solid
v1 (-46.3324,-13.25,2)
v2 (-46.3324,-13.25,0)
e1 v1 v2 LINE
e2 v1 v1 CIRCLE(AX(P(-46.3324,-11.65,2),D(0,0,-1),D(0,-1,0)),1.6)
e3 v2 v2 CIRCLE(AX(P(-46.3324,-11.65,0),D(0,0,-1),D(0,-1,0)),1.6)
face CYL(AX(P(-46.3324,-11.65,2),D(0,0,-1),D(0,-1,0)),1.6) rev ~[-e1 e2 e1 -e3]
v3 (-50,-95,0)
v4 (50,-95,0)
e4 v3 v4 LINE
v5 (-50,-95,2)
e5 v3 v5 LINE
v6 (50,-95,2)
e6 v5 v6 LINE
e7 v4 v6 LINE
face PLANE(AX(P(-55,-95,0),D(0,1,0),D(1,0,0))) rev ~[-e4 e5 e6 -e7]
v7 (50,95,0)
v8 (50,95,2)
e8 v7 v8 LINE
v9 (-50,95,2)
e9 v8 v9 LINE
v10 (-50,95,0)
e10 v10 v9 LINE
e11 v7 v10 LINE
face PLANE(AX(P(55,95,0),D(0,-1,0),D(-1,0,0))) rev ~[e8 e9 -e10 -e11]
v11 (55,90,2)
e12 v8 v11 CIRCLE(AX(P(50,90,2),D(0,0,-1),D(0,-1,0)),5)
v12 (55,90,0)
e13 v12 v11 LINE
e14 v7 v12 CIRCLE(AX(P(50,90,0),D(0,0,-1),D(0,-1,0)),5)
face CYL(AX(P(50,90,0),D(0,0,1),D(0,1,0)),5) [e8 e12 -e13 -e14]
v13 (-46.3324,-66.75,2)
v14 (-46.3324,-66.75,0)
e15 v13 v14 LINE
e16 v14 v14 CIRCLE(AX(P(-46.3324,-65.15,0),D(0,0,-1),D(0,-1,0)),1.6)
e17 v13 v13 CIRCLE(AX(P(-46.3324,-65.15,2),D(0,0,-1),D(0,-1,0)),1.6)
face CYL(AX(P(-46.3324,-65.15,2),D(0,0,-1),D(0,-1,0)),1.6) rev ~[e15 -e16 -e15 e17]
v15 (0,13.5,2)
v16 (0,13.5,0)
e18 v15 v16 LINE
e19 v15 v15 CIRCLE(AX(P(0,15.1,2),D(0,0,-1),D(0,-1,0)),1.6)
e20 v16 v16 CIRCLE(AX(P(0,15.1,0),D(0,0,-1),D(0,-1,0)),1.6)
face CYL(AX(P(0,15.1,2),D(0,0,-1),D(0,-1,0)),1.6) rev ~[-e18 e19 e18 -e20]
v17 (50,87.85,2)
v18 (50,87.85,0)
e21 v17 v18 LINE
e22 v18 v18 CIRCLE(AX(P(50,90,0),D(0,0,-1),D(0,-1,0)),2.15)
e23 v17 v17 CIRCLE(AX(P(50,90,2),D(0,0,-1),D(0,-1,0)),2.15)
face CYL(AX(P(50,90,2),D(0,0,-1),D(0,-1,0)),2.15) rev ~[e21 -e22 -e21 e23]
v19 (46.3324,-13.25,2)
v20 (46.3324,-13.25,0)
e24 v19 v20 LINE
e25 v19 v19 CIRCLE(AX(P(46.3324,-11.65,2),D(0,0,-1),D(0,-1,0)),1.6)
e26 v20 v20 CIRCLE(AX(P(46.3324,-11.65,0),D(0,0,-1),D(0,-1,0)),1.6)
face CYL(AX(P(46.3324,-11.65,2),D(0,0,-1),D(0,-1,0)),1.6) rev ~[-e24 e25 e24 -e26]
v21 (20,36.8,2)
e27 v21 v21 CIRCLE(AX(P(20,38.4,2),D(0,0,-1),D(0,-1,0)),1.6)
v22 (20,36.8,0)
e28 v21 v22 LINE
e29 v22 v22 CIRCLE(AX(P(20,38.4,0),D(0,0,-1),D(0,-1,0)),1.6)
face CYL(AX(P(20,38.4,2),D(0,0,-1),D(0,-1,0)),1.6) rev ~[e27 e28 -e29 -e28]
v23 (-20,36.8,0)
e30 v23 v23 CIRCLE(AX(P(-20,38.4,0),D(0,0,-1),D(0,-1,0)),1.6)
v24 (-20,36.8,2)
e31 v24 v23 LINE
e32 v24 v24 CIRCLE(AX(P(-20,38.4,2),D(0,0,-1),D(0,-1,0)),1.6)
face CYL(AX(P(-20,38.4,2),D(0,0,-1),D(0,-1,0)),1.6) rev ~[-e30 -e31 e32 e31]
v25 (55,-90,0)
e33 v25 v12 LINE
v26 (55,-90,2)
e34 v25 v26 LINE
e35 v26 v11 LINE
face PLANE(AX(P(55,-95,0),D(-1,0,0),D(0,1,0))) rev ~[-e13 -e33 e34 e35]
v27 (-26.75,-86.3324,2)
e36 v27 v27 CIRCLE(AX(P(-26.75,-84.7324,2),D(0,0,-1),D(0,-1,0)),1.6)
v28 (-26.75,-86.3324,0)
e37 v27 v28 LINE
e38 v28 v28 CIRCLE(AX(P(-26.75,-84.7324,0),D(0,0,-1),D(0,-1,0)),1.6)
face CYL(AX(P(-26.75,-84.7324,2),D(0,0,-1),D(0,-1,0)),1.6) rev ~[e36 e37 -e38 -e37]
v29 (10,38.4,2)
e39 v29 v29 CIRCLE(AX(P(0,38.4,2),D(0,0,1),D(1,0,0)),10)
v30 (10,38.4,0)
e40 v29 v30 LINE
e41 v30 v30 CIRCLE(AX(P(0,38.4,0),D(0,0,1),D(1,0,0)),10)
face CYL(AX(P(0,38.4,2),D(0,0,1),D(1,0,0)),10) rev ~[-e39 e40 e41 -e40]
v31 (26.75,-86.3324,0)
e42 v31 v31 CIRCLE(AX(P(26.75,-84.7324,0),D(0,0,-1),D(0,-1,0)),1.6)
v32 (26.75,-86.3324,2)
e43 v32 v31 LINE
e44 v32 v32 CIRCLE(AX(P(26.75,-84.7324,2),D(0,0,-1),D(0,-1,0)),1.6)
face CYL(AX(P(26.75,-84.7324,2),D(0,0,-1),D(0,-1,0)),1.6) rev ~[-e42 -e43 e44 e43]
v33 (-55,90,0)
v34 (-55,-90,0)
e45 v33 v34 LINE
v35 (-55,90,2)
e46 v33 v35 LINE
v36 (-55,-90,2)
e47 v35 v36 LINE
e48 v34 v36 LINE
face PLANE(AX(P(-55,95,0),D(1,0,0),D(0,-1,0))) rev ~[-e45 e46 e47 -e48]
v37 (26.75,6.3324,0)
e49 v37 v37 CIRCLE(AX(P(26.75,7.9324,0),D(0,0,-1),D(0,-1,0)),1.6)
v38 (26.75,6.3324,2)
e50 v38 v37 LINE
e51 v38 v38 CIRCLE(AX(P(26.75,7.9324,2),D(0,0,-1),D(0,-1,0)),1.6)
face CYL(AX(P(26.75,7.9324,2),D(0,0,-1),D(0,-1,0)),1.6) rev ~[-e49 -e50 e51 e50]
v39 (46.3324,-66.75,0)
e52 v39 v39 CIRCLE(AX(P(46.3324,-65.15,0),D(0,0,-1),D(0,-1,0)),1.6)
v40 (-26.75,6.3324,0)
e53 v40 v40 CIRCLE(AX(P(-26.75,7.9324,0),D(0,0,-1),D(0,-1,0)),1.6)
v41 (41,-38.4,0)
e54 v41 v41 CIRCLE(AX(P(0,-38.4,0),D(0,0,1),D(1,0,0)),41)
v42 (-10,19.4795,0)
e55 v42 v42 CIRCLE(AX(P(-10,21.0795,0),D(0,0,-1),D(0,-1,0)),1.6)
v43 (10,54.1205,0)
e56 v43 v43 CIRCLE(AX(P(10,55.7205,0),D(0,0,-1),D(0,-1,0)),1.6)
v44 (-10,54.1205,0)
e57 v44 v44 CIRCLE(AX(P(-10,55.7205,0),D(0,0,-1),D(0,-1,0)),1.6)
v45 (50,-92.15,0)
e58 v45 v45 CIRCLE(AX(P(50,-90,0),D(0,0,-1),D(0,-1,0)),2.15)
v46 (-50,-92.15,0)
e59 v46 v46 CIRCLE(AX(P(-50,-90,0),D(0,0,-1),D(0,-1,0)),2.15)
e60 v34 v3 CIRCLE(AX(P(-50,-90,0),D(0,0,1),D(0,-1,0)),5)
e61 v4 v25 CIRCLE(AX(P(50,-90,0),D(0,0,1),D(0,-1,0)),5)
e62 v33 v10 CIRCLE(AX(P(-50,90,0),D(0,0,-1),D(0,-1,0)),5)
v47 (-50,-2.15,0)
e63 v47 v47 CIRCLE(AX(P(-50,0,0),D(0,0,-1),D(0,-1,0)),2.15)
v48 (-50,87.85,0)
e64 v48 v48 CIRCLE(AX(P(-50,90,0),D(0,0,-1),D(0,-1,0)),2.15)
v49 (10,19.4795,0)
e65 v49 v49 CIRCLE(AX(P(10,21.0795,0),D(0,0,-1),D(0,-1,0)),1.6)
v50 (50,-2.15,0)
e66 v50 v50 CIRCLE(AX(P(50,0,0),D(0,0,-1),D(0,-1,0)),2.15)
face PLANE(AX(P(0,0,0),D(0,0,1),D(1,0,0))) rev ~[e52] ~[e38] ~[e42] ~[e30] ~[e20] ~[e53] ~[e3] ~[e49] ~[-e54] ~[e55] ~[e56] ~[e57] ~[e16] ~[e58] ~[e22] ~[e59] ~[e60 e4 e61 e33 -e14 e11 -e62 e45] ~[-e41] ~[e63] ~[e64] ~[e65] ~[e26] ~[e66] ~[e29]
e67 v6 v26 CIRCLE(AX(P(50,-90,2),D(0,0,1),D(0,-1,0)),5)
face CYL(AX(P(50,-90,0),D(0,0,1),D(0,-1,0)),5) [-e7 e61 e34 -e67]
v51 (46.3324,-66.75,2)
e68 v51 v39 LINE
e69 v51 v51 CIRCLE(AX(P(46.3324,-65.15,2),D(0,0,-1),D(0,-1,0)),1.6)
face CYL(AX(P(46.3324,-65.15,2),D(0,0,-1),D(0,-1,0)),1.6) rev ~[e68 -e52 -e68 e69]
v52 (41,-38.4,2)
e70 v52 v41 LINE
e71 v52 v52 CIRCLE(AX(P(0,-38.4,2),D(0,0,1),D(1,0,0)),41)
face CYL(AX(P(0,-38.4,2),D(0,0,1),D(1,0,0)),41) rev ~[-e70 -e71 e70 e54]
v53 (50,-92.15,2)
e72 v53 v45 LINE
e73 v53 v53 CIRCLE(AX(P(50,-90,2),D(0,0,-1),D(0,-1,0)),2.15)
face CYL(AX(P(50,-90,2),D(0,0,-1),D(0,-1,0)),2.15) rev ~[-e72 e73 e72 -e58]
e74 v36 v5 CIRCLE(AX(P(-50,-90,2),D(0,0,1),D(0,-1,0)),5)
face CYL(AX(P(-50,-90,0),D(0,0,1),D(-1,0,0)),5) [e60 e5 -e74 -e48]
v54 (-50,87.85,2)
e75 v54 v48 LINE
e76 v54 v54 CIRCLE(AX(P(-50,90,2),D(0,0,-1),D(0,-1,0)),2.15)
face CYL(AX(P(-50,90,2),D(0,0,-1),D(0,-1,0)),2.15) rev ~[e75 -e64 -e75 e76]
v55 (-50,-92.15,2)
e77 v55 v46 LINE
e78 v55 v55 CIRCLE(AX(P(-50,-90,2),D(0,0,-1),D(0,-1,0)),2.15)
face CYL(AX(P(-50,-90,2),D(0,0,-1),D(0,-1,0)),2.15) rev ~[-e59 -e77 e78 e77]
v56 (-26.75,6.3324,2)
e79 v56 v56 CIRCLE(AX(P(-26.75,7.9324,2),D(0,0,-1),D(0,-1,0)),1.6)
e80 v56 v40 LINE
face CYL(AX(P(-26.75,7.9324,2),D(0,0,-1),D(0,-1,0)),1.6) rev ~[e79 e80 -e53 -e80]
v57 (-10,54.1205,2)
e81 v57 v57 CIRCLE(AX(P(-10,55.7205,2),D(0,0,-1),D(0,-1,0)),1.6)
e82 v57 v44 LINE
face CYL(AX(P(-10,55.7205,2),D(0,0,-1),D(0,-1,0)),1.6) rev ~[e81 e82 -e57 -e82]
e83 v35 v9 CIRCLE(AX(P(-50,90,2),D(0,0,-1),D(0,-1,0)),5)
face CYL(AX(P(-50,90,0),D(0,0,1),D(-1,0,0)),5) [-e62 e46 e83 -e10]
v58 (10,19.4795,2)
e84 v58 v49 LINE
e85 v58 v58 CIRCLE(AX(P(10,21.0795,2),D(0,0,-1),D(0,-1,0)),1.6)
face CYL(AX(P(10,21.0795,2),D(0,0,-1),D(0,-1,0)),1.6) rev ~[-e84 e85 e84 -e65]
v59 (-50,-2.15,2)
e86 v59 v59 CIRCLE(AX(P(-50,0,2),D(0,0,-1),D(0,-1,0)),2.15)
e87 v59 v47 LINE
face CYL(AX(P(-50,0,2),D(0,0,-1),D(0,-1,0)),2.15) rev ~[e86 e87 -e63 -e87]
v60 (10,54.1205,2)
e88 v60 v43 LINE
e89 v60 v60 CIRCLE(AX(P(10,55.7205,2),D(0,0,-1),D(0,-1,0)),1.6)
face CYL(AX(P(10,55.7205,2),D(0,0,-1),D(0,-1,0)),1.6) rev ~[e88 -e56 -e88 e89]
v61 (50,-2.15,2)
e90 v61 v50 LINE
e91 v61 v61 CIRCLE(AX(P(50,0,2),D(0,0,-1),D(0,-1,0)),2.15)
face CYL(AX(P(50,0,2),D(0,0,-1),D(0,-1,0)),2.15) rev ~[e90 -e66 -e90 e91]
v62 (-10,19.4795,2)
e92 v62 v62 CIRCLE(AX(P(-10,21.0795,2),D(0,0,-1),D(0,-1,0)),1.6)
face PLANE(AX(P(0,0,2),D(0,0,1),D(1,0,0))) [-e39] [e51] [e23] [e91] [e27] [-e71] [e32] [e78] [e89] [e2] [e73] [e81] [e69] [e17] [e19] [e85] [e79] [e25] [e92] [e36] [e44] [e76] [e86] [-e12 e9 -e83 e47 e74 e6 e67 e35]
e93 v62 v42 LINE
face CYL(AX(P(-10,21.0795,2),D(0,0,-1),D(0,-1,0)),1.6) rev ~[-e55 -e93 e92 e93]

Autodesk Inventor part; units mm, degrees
ref_plane "YZ Plane" through (0, 0, 0) normal (1, 0, 0) x (0, 1, 0)
ref_plane "XZ Plane" through (0, 0, 0) normal (0, 1, 0) x (-1, 0, 0)
ref_plane "XY Plane" through (0, 0, 0) normal (0, 0, 1) x (1, 0, 0)
sketch "スケッチ1" plane through (0, 0, 0) normal (0, 0, 1) x (1, 0, 0)
  line L0 (-55, -95) -> (55, -95)
  line L1 (55, -95) -> (55, 95)
  line L2 (55, 95) -> (-55, 95)
  line L3 (-55, 95) -> (-55, -95)
  line L4 (-55, -95) -> (55, 95) construction
  line L5 (55, -95) -> (-55, 95) construction
  circle A0 centre (0, 40) radius 6.5
  line L6 (0, 40) -> (-55, 95)
  point P0 (0, 0)
  dimension "d0" = 110
  dimension "d39" = 45
extrude "プレート1" add sketch "スケッチ1" along normal blind 2 contours L3 L2 L1 L0 | A0
sketch "スケッチ2" plane through (0, 0, 2) normal (0, 0, 1) x (1, 0, 0)
  circle A0 centre (0, -40) radius 12.5
  point P0 (0, 0)
  point P1 (0, -27.5)
  point P2 (-12.5, -40)
  point P3 (0, -52.5)
  point P4 (12.5, -40)
  dimension "d8" = 25
  dimension "d11" = 360
hole "穴1" at (0, -27.5, 2) at (-12.5, -40, 2) at (0, -52.5, 2) at (12.5, -40, 2) direction (0, 0, -1) diameter 3.2 end through all clearance for "Socket Head Cap Screw" size "M3" standard "Ansi Metric M Profile"
sketch "スケッチ3" plane through (0, 0, 2) normal (0, 0, 1) x (1, 0, 0)
  circle A0 centre (0, 38.4) radius 10
  point P0 (0, 0)
  dimension "d22" = 20
  dimension "d58" = 38.4
extrude "押し出し1" cut sketch "スケッチ3" against normal blind 10
sketch "スケッチ4" plane through (0, 0, 2) normal (0, 0, 1) x (1, 0, 0)
  line L0 (-55, 95) -> (55, 95) projected
  line L1 (-55, -95) -> (-55, 95) projected
  line L2 (55, 95) -> (55, -95) projected
  line L3 (55, -95) -> (-55, -95) projected
  line L4 (50, 90) -> (-50, 90)
  line L5 (-50, 90) -> (-50, -90)
  line L6 (-50, -90) -> (50, -90)
  line L7 (50, -90) -> (50, 90)
  point P0 (0, 0)
  point P1 (-50, 0)
  point P2 (50, 0)
  dimension "d25" = 5
hole "穴2" at (-50, 90, 2) at (50, 90, 2) at (50, -90, 2) at (-50, -90, 2) at (50, 0, 2) at (-50, 0, 2) direction (0, 0, -1) diameter 4.3 end through all clearance for "Socket Head Cap Screw" size "M4" standard "Ansi Metric M Profile"
fillet "コーナーR1" radius 5 4 edges at (55, 95, 1) (-55, 95, 1) (-55, -95, 1) (55, -95, 1)
sketch "スケッチ5" plane through (0, 0, 2) normal (0, 0, 1) x (1, 0, 0)
  circle A0 centre (0, -38.4) radius 41
  point P0 (0, 0)
  dimension "d35" = 82
  dimension "d59" = 38.4
extrude "押し出し2" cut sketch "スケッチ5" against normal blind 10
sketch "スケッチ6" plane through (0, 0, 2) normal (0, 0, 1) x (1, 0, 0)
  circle A0 centre (0, -38.4) radius 41 projected
  circle A1 centre (0, -38.4) radius 53.5
  circle A2 centre (0, 38.4) radius 10 projected
  circle A3 centre (0, 38.4) radius 20
  point P0 (0, 0)
  point P1 (-46.3324, -65.15)
  point P2 (-26.75, -84.7324)
  point P3 (0, -91.9)
  point P4 (26.75, -84.7324)
  point P5 (46.3324, -65.15)
  point P6 (53.5, -38.4)
  point P7 (46.3324, -11.65)
  point P8 (26.75, 7.9324)
  point P9 (0, 15.1)
  point P10 (-26.75, 7.9324)
  point P11 (-46.3324, -11.65)
  point P12 (-53.5, -38.4)
  point P13 (-10, 55.7205)
  point P14 (-20, 38.4)
  point P15 (-10, 21.0795)
  point P16 (10, 21.0795)
  point P17 (20, 38.4)
  point P18 (10, 55.7205)
  dimension "d40" = 107
  dimension "d52" = 40
  dimension "d43" = 360
  dimension "d55" = 360
  dimension "d57" = 0
hole "穴3" at (-26.75, -84.7324, 2) at (-46.3324, -65.15, 2) at (-46.3324, -11.65, 2) at (-26.75, 7.9324, 2) at (26.75, 7.9324, 2) at (46.3324, -11.65, 2) at (46.3324, -65.15, 2) at (26.75, -84.7324, 2) at (10, 55.7205, 2) at (20, 38.4, 2) at (-20, 38.4, 2) at (-10, 55.7205, 2) at (0, 15.1, 2) at (10, 21.0795, 2) at (-10, 21.0795, 2) direction (0, 0, -1) diameter 3.2 end through all clearance for "Socket Head Cap Screw" size "M3" standard "Ansi Metric M Profile"
equation "\"d20\" = Thickness"
equation "\"d50\" = Thickness"
equation "\"d2\" = Thickness"
equation "\"BendRadius\" = Thickness"
equation "\"BendReliefWidth\" = Thickness"
equation "\"BendReliefDepth\" = 0.5 * Thickness"
equation "\"CornerReliefSize\" = 4 * Thickness"
equation "\"MinimumRemnant\" = 2 * Thickness"
equation "\"TransitionRadius\" = BendRadius"
equation "\"JacobiRadiusSize\" = BendRadius"
equation "\"GapSize\" = Thickness"
equation "\"Thickness\" = 2"
properties part number "carbonplate2" material "CFRP"
